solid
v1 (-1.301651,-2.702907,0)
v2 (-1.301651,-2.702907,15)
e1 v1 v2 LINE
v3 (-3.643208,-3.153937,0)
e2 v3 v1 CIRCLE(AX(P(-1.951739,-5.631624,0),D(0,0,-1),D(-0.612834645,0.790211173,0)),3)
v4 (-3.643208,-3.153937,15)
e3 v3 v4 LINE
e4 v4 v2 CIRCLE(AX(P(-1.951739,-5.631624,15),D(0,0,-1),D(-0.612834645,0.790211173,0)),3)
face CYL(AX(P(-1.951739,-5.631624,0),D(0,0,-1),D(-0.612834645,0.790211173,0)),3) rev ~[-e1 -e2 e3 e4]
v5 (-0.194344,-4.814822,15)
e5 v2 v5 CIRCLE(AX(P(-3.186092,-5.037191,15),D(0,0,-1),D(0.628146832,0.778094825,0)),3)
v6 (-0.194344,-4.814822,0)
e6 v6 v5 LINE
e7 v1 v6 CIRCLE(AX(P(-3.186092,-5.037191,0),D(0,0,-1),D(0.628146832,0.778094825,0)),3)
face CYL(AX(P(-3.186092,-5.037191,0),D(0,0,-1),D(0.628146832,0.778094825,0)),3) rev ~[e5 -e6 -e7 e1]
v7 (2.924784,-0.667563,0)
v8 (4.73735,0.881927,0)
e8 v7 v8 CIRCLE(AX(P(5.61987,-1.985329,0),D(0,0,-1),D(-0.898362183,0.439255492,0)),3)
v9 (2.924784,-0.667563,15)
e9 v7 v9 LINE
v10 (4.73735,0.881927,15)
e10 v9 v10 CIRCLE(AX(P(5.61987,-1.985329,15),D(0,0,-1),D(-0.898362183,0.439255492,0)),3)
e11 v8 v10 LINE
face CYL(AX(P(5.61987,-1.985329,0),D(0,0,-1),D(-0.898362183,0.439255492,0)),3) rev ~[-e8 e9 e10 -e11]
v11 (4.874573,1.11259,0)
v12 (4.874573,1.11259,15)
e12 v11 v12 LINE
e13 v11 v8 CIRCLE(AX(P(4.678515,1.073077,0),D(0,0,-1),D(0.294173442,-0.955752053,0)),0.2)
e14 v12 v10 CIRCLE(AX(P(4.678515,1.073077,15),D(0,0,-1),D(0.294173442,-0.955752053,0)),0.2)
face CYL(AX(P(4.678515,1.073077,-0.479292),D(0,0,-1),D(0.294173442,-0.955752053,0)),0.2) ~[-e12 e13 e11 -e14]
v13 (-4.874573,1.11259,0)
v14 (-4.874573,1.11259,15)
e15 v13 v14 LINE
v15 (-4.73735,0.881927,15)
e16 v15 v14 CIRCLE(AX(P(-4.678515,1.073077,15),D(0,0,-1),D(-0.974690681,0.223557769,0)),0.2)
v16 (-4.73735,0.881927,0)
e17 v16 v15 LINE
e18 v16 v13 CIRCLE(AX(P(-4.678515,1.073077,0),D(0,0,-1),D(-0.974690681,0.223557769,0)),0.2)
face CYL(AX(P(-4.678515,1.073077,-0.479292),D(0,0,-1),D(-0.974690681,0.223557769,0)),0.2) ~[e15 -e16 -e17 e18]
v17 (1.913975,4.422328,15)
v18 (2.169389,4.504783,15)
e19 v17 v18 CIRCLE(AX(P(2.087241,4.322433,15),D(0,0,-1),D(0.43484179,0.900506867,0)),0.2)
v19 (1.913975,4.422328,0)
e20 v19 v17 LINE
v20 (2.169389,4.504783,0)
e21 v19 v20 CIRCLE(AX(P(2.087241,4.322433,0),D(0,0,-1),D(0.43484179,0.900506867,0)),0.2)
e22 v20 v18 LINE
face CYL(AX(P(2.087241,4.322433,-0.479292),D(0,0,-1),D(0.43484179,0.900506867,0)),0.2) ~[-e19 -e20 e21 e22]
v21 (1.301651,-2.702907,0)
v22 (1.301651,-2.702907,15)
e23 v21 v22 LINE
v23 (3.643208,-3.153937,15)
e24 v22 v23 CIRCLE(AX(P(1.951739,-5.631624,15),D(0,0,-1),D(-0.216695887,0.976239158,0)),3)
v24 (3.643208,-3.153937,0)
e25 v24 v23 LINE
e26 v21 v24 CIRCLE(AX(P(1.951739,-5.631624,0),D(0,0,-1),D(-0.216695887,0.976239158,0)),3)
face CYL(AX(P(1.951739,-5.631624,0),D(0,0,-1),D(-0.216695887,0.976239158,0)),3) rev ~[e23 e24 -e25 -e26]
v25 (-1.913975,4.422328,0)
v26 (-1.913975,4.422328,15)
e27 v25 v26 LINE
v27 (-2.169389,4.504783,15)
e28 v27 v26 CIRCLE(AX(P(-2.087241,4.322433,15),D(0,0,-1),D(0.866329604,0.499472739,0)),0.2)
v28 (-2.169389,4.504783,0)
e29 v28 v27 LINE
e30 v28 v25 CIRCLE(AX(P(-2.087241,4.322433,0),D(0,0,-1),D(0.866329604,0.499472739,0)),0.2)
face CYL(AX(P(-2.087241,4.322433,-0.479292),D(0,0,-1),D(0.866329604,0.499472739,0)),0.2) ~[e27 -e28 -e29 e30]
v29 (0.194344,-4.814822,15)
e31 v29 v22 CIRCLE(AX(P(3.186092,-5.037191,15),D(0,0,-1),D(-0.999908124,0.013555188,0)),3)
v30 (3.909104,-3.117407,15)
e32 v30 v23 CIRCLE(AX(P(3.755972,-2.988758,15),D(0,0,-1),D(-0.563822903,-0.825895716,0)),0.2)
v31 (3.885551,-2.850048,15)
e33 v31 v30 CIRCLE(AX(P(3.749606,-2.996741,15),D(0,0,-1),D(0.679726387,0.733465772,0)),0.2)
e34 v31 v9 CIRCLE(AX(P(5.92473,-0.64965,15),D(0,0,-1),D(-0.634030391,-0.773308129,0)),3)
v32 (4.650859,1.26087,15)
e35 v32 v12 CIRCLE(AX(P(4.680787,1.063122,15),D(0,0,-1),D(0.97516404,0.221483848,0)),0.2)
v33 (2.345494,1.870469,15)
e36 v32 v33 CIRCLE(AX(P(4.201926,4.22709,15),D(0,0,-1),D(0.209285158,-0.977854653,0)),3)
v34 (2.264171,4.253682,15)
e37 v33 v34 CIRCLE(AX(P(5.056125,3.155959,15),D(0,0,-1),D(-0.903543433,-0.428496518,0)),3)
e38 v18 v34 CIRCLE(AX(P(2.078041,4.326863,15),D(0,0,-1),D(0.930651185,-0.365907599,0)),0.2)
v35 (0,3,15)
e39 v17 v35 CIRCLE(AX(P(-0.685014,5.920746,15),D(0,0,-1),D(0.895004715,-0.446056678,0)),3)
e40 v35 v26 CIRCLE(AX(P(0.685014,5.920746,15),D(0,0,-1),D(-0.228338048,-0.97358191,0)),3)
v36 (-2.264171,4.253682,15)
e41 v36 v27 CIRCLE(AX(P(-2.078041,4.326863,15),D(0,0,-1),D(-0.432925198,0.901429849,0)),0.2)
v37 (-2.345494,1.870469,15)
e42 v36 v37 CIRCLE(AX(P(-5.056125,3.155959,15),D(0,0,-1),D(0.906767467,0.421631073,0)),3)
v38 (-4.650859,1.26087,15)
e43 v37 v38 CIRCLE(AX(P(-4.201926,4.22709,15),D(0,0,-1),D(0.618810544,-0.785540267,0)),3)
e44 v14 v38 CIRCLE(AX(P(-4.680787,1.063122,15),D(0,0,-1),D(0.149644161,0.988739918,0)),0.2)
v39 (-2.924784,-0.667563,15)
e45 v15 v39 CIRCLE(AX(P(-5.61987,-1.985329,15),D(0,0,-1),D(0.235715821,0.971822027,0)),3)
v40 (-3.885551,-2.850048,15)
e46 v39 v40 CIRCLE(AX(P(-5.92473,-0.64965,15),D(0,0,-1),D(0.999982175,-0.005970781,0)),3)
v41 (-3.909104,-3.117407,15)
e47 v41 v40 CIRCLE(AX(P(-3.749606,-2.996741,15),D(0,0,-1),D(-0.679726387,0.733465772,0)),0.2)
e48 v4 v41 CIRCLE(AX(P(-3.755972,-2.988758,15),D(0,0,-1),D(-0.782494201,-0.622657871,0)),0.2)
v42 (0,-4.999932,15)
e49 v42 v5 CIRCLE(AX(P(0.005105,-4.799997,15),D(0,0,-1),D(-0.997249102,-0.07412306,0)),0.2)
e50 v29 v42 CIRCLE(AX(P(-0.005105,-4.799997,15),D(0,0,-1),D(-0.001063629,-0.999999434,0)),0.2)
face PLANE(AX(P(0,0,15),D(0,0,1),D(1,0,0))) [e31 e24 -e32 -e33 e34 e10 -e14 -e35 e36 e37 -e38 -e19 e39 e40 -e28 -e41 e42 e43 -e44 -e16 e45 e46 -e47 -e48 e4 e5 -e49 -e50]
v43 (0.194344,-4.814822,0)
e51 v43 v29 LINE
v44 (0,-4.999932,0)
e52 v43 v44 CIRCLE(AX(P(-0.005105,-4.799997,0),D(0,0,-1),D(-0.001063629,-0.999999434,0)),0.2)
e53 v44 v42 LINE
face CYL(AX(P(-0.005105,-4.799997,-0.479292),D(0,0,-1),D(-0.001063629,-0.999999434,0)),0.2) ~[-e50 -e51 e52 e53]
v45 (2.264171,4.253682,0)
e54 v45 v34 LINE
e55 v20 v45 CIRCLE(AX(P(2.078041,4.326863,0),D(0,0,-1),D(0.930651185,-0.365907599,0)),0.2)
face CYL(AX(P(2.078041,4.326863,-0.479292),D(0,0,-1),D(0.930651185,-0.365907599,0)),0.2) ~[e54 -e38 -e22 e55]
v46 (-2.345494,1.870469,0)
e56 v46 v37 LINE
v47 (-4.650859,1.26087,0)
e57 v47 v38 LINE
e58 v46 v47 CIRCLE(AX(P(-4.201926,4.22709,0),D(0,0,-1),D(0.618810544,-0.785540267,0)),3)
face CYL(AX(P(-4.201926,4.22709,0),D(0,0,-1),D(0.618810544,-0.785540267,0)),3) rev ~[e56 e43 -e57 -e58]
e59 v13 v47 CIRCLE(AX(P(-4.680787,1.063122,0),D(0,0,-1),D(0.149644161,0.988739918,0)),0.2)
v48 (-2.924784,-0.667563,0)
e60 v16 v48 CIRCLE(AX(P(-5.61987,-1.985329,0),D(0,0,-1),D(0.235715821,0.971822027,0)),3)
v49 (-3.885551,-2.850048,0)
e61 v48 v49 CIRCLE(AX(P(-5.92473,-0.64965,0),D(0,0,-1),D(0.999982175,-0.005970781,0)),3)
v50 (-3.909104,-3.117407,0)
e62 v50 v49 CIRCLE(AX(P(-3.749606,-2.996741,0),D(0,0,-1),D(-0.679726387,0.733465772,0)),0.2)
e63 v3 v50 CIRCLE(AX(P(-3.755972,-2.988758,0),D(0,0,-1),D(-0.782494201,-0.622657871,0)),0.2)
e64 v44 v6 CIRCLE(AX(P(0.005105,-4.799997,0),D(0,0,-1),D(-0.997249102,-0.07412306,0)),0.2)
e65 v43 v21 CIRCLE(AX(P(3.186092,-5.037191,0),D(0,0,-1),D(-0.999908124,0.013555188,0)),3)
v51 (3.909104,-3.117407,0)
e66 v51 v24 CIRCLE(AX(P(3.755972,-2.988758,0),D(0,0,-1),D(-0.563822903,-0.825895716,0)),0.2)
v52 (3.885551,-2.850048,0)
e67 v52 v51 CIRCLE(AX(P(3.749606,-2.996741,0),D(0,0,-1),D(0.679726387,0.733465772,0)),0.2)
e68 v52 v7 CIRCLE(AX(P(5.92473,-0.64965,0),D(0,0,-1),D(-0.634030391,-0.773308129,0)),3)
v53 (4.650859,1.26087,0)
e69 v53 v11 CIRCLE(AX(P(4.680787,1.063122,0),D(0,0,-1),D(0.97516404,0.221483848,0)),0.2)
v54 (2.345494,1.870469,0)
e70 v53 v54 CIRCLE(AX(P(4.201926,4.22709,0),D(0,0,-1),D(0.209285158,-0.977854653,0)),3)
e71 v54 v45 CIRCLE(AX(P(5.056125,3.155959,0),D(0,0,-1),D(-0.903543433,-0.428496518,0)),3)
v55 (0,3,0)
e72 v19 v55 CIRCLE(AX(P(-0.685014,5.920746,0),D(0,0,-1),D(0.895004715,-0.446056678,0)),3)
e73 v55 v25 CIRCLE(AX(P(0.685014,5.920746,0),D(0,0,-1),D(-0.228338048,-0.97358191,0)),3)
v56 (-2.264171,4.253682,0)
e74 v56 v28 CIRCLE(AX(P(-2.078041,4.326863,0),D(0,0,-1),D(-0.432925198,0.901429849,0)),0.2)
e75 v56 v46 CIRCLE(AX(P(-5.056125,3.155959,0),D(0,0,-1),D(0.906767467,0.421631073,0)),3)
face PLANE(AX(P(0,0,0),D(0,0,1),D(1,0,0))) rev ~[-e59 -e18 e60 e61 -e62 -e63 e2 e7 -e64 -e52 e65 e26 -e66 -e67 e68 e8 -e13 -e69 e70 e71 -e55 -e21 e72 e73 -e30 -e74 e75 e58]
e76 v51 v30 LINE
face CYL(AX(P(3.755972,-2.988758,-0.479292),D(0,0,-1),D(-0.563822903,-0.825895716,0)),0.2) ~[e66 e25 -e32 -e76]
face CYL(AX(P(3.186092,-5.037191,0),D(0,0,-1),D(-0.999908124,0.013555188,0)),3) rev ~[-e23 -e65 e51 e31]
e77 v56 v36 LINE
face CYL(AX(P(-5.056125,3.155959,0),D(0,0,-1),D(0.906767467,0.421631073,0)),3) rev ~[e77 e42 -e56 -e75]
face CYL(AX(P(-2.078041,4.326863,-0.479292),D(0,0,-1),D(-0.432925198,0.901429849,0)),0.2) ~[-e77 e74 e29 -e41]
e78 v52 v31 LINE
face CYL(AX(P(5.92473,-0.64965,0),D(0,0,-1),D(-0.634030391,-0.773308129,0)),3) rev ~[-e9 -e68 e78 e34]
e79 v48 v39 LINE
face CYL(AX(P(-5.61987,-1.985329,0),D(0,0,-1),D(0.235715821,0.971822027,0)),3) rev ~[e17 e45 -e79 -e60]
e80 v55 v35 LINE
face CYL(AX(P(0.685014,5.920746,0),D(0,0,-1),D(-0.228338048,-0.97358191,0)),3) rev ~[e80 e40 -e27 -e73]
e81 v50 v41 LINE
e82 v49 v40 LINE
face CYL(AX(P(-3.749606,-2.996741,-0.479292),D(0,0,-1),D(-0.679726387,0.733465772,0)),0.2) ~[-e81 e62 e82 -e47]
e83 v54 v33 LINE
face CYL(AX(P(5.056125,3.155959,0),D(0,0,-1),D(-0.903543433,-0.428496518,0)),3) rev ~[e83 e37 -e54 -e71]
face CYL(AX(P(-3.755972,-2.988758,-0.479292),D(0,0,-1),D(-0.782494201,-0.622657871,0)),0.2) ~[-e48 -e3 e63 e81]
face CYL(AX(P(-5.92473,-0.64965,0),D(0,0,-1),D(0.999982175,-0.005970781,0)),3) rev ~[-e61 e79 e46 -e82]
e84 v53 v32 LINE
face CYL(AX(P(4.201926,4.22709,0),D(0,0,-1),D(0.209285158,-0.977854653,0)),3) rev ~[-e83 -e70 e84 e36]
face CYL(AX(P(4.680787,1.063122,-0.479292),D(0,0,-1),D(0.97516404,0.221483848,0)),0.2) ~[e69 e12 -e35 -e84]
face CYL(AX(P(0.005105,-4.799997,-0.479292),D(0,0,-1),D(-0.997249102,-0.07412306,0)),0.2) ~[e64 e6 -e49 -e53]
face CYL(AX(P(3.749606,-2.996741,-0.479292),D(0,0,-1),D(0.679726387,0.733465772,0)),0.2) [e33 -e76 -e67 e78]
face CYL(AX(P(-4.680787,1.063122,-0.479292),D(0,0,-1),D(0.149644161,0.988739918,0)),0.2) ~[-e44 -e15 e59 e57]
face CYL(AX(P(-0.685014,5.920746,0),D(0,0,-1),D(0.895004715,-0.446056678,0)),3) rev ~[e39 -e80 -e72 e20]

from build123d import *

# Parameters (mm, degrees)
F1_DEPTH    = 15
F2_T1_DEPTH = 15.9585845768


# Not quite as in the source:
# - a fillet or chamfer that OpenCascade refuses, or shapes differently, is made with other operations: its cross-section is extruded or revolved along the edge and cut away or added


with BuildPart() as f1:
    # F0 (on Top) → F1 (new body)
    with BuildSketch(Plane.XY):
        with BuildLine():
            ThreePointArc((2.9247837365, -0.6675628019), (3.7405193144, 0.3530547619), (4.9127228226, 0.9301368008))
            ThreePointArc((4.9127228226, 0.9301368008), (4.8746395609, 1.1126046698), (4.8297815528, 1.2935262471))
            ThreePointArc((4.8297815528, 1.2935262471), (3.5232761722, 1.3048591573), (2.3454944474, 1.8704694056))
            ThreePointArc((2.3454944474, 1.8704694056), (2.0561463183, 3.1445818043), (2.3358223454, 4.420852177))
            ThreePointArc((2.3358223454, 4.420852177), (2.1694186956, 4.5048443395), (2, 4.582575695))
            ThreePointArc((2, 4.582575695), (1.1765467932, 3.5681746103), (0, 3))
            ThreePointArc((0, 3), (-1.1765467932, 3.5681746103), (-2, 4.582575695))
            ThreePointArc((-2, 4.582575695), (-2.1694186956, 4.5048443395), (-2.3358223454, 4.420852177))
            ThreePointArc((-2.3358223454, 4.420852177), (-2.0561463183, 3.1445818043), (-2.3454944474, 1.8704694056))
            ThreePointArc((-2.3454944474, 1.8704694056), (-3.5232761722, 1.3048591573), (-4.8297815528, 1.2935262471))
            ThreePointArc((-4.8297815528, 1.2935262471), (-4.8746395609, 1.1126046698), (-4.9127228226, 0.9301368008))
            ThreePointArc((-4.9127228226, 0.9301368008), (-3.7405193144, 0.3530547619), (-2.9247837365, -0.6675628019))
            ThreePointArc((-2.9247837365, -0.6675628019), (-3.2169067319, -1.9410418555), (-4.0226390868, -2.9695748479))
            ThreePointArc((-4.0226390868, -2.9695748479), (-3.9091574123, -3.1174490093), (-3.7902428131, -3.2609905577))
            ThreePointArc((-3.7902428131, -3.2609905577), (-2.608204974, -2.7043297172), (-1.3016512174, -2.7029066037))
            ThreePointArc((-1.3016512174, -2.7029066037), (-0.4881409094, -3.725298761), (-0.1863673415, -4.9965255142))
            ThreePointArc((-0.1863673415, -4.9965255142), (0, -5), (0.1863673415, -4.9965255142))
            ThreePointArc((0.1863673415, -4.9965255142), (0.4881409094, -3.725298761), (1.3016512174, -2.7029066037))
            ThreePointArc((1.3016512174, -2.7029066037), (2.608204974, -2.7043297172), (3.7902428131, -3.2609905577))
            ThreePointArc((3.7902428131, -3.2609905577), (3.9091574123, -3.1174490093), (4.0226390868, -2.9695748479))
            ThreePointArc((4.0226390868, -2.9695748479), (3.2169067319, -1.9410418555), (2.9247837365, -0.6675628019))
        make_face()
    extrude(amount=F1_DEPTH)

    # F2: fillet of radius 0.2 on 14 edges, made by hand

    # F2_s2 → F2_t1 (cut)
    with BuildSketch(Plane.XY.offset(-0.4792922884)):
        with BuildLine():
            ThreePointArc((-3.9124710062, -3.1132893578), (-3.785825601, -3.1865171636), (-3.6432075854, -3.1539369268))
            ThreePointArc((-3.6432075854, -3.1539369268), (-3.7175366677, -3.2063492126), (-3.7902428131, -3.2609905577))
            ThreePointArc((-3.7902428131, -3.2609905577), (-3.8520648952, -3.1877258419), (-3.9124710062, -3.1132893578))
        make_face()
        with BuildLine():
            ThreePointArc((-3.8855510977, -2.8500477743), (-3.949049974, -2.9818402738), (-3.905839396, -3.121605134))
            ThreePointArc((-3.905839396, -3.121605134), (-3.9649679778, -3.0461498543), (-4.0226390868, -2.9695748479))
            ThreePointArc((-4.0226390868, -2.9695748479), (-3.9531890749, -2.9108504406), (-3.8855510977, -2.8500477743))
        make_face()
        with BuildLine():
            ThreePointArc((-0.1943444075, -4.814821897), (-0.1308957841, -4.946638597), (0.0053181385, -4.9999971717))
            ThreePointArc((0.0053181385, -4.9999971717), (-0.0905412424, -4.9991801611), (-0.1863673415, -4.9965255142))
            ThreePointArc((-0.1863673415, -4.9965255142), (-0.1889785578, -4.9056132393), (-0.1943444075, -4.814821897))
        make_face()
        with BuildLine():
            ThreePointArc((-0.0053181385, -4.9999971717), (0.1308957841, -4.946638597), (0.1943444075, -4.814821897))
            ThreePointArc((0.1943444075, -4.814821897), (0.1889785578, -4.9056132393), (0.1863673415, -4.9965255142))
            ThreePointArc((0.1863673415, -4.9965255142), (0.0905412424, -4.9991801611), (-0.0053181385, -4.9999971717))
        make_face()
        with BuildLine():
            ThreePointArc((3.6432075854, -3.1539369268), (3.785825601, -3.1865171636), (3.9124710062, -3.1132893578))
            ThreePointArc((3.9124710062, -3.1132893578), (3.8520648952, -3.1877258419), (3.7902428131, -3.2609905577))
            ThreePointArc((3.7902428131, -3.2609905577), (3.7175366677, -3.2063492126), (3.6432075854, -3.1539369268))
        make_face()
        with BuildLine():
            ThreePointArc((3.8855510977, -2.8500477743), (3.949049974, -2.9818402738), (3.905839396, -3.121605134))
            ThreePointArc((3.905839396, -3.121605134), (3.9649679778, -3.0461498543), (4.0226390868, -2.9695748479))
            ThreePointArc((4.0226390868, -2.9695748479), (3.9531890749, -2.9108504406), (3.8855510977, -2.8500477743))
        make_face()
        with BuildLine():
            ThreePointArc((4.7373499587, 0.8819268779), (4.8517430918, 0.973116687), (4.8734534064, 1.1177888421))
            ThreePointArc((4.8734534064, 1.1177888421), (4.8939875989, 1.024151054), (4.9127228226, 0.9301368008))
            ThreePointArc((4.9127228226, 0.9301368008), (4.8246709586, 0.9073611688), (4.7373499587, 0.8819268779))
        make_face()
        with BuildLine():
            ThreePointArc((4.8758202007, 1.1074192388), (4.7934889875, 1.228344594), (4.6508585605, 1.2608704528))
            ThreePointArc((4.6508585605, 1.2608704528), (4.7405675882, 1.2758421104), (4.8297815528, 1.2935262471))
            ThreePointArc((4.8297815528, 1.2935262471), (4.8536929553, 1.2006934229), (4.8758202007, 1.1074192388))
        make_face()
        with BuildLine():
            ThreePointArc((2.2641711887, 4.2536817555), (2.2641990769, 4.3999738244), (2.1646259913, 4.5071492451))
            ThreePointArc((2.1646259913, 4.5071492451), (2.2506378215, 4.4648213174), (2.3358223454, 4.420852177))
            ThreePointArc((2.3358223454, 4.420852177), (2.2987296122, 4.3378100833), (2.2641711887, 4.2536817555))
        make_face()
        with BuildLine():
            ThreePointArc((2.1742089456, 4.5025343375), (2.0283330241, 4.5135609289), (1.913974667, 4.4223275119))
            ThreePointArc((1.913974667, 4.4223275119), (1.9582020177, 4.5017995299), (2, 4.582575695))
            ThreePointArc((2, 4.582575695), (2.0874881401, 4.543390063), (2.1742089456, 4.5025343375))
        make_face()
        with BuildLine():
            ThreePointArc((-1.913974667, 4.4223275119), (-2.0283330241, 4.5135609289), (-2.1742089456, 4.5025343375))
            ThreePointArc((-2.1742089456, 4.5025343375), (-2.0874881401, 4.543390063), (-2, 4.582575695))
            ThreePointArc((-2, 4.582575695), (-1.9582020177, 4.5017995299), (-1.913974667, 4.4223275119))
        make_face()
        with BuildLine():
            ThreePointArc((-2.1646259913, 4.5071492451), (-2.2641990769, 4.3999738244), (-2.2641711887, 4.2536817555))
            ThreePointArc((-2.2641711887, 4.2536817555), (-2.2987296122, 4.3378100833), (-2.3358223454, 4.420852177))
            ThreePointArc((-2.3358223454, 4.420852177), (-2.2506378215, 4.4648213174), (-2.1646259913, 4.5071492451))
        make_face()
        with BuildLine():
            ThreePointArc((-4.8734534064, 1.1177888421), (-4.8517430918, 0.973116687), (-4.7373499587, 0.8819268779))
            ThreePointArc((-4.7373499587, 0.8819268779), (-4.8246709586, 0.9073611688), (-4.9127228226, 0.9301368008))
            ThreePointArc((-4.9127228226, 0.9301368008), (-4.8939875989, 1.024151054), (-4.8734534064, 1.1177888421))
        make_face()
        with BuildLine():
            ThreePointArc((-4.6508585605, 1.2608704528), (-4.7934889875, 1.228344594), (-4.8758202007, 1.1074192388))
            ThreePointArc((-4.8758202007, 1.1074192388), (-4.8536929553, 1.2006934229), (-4.8297815528, 1.2935262471))
            ThreePointArc((-4.8297815528, 1.2935262471), (-4.7405675882, 1.2758421104), (-4.6508585605, 1.2608704528))
        make_face()
    extrude(amount=F2_T1_DEPTH, mode=Mode.SUBTRACT)


solid = f1.part
